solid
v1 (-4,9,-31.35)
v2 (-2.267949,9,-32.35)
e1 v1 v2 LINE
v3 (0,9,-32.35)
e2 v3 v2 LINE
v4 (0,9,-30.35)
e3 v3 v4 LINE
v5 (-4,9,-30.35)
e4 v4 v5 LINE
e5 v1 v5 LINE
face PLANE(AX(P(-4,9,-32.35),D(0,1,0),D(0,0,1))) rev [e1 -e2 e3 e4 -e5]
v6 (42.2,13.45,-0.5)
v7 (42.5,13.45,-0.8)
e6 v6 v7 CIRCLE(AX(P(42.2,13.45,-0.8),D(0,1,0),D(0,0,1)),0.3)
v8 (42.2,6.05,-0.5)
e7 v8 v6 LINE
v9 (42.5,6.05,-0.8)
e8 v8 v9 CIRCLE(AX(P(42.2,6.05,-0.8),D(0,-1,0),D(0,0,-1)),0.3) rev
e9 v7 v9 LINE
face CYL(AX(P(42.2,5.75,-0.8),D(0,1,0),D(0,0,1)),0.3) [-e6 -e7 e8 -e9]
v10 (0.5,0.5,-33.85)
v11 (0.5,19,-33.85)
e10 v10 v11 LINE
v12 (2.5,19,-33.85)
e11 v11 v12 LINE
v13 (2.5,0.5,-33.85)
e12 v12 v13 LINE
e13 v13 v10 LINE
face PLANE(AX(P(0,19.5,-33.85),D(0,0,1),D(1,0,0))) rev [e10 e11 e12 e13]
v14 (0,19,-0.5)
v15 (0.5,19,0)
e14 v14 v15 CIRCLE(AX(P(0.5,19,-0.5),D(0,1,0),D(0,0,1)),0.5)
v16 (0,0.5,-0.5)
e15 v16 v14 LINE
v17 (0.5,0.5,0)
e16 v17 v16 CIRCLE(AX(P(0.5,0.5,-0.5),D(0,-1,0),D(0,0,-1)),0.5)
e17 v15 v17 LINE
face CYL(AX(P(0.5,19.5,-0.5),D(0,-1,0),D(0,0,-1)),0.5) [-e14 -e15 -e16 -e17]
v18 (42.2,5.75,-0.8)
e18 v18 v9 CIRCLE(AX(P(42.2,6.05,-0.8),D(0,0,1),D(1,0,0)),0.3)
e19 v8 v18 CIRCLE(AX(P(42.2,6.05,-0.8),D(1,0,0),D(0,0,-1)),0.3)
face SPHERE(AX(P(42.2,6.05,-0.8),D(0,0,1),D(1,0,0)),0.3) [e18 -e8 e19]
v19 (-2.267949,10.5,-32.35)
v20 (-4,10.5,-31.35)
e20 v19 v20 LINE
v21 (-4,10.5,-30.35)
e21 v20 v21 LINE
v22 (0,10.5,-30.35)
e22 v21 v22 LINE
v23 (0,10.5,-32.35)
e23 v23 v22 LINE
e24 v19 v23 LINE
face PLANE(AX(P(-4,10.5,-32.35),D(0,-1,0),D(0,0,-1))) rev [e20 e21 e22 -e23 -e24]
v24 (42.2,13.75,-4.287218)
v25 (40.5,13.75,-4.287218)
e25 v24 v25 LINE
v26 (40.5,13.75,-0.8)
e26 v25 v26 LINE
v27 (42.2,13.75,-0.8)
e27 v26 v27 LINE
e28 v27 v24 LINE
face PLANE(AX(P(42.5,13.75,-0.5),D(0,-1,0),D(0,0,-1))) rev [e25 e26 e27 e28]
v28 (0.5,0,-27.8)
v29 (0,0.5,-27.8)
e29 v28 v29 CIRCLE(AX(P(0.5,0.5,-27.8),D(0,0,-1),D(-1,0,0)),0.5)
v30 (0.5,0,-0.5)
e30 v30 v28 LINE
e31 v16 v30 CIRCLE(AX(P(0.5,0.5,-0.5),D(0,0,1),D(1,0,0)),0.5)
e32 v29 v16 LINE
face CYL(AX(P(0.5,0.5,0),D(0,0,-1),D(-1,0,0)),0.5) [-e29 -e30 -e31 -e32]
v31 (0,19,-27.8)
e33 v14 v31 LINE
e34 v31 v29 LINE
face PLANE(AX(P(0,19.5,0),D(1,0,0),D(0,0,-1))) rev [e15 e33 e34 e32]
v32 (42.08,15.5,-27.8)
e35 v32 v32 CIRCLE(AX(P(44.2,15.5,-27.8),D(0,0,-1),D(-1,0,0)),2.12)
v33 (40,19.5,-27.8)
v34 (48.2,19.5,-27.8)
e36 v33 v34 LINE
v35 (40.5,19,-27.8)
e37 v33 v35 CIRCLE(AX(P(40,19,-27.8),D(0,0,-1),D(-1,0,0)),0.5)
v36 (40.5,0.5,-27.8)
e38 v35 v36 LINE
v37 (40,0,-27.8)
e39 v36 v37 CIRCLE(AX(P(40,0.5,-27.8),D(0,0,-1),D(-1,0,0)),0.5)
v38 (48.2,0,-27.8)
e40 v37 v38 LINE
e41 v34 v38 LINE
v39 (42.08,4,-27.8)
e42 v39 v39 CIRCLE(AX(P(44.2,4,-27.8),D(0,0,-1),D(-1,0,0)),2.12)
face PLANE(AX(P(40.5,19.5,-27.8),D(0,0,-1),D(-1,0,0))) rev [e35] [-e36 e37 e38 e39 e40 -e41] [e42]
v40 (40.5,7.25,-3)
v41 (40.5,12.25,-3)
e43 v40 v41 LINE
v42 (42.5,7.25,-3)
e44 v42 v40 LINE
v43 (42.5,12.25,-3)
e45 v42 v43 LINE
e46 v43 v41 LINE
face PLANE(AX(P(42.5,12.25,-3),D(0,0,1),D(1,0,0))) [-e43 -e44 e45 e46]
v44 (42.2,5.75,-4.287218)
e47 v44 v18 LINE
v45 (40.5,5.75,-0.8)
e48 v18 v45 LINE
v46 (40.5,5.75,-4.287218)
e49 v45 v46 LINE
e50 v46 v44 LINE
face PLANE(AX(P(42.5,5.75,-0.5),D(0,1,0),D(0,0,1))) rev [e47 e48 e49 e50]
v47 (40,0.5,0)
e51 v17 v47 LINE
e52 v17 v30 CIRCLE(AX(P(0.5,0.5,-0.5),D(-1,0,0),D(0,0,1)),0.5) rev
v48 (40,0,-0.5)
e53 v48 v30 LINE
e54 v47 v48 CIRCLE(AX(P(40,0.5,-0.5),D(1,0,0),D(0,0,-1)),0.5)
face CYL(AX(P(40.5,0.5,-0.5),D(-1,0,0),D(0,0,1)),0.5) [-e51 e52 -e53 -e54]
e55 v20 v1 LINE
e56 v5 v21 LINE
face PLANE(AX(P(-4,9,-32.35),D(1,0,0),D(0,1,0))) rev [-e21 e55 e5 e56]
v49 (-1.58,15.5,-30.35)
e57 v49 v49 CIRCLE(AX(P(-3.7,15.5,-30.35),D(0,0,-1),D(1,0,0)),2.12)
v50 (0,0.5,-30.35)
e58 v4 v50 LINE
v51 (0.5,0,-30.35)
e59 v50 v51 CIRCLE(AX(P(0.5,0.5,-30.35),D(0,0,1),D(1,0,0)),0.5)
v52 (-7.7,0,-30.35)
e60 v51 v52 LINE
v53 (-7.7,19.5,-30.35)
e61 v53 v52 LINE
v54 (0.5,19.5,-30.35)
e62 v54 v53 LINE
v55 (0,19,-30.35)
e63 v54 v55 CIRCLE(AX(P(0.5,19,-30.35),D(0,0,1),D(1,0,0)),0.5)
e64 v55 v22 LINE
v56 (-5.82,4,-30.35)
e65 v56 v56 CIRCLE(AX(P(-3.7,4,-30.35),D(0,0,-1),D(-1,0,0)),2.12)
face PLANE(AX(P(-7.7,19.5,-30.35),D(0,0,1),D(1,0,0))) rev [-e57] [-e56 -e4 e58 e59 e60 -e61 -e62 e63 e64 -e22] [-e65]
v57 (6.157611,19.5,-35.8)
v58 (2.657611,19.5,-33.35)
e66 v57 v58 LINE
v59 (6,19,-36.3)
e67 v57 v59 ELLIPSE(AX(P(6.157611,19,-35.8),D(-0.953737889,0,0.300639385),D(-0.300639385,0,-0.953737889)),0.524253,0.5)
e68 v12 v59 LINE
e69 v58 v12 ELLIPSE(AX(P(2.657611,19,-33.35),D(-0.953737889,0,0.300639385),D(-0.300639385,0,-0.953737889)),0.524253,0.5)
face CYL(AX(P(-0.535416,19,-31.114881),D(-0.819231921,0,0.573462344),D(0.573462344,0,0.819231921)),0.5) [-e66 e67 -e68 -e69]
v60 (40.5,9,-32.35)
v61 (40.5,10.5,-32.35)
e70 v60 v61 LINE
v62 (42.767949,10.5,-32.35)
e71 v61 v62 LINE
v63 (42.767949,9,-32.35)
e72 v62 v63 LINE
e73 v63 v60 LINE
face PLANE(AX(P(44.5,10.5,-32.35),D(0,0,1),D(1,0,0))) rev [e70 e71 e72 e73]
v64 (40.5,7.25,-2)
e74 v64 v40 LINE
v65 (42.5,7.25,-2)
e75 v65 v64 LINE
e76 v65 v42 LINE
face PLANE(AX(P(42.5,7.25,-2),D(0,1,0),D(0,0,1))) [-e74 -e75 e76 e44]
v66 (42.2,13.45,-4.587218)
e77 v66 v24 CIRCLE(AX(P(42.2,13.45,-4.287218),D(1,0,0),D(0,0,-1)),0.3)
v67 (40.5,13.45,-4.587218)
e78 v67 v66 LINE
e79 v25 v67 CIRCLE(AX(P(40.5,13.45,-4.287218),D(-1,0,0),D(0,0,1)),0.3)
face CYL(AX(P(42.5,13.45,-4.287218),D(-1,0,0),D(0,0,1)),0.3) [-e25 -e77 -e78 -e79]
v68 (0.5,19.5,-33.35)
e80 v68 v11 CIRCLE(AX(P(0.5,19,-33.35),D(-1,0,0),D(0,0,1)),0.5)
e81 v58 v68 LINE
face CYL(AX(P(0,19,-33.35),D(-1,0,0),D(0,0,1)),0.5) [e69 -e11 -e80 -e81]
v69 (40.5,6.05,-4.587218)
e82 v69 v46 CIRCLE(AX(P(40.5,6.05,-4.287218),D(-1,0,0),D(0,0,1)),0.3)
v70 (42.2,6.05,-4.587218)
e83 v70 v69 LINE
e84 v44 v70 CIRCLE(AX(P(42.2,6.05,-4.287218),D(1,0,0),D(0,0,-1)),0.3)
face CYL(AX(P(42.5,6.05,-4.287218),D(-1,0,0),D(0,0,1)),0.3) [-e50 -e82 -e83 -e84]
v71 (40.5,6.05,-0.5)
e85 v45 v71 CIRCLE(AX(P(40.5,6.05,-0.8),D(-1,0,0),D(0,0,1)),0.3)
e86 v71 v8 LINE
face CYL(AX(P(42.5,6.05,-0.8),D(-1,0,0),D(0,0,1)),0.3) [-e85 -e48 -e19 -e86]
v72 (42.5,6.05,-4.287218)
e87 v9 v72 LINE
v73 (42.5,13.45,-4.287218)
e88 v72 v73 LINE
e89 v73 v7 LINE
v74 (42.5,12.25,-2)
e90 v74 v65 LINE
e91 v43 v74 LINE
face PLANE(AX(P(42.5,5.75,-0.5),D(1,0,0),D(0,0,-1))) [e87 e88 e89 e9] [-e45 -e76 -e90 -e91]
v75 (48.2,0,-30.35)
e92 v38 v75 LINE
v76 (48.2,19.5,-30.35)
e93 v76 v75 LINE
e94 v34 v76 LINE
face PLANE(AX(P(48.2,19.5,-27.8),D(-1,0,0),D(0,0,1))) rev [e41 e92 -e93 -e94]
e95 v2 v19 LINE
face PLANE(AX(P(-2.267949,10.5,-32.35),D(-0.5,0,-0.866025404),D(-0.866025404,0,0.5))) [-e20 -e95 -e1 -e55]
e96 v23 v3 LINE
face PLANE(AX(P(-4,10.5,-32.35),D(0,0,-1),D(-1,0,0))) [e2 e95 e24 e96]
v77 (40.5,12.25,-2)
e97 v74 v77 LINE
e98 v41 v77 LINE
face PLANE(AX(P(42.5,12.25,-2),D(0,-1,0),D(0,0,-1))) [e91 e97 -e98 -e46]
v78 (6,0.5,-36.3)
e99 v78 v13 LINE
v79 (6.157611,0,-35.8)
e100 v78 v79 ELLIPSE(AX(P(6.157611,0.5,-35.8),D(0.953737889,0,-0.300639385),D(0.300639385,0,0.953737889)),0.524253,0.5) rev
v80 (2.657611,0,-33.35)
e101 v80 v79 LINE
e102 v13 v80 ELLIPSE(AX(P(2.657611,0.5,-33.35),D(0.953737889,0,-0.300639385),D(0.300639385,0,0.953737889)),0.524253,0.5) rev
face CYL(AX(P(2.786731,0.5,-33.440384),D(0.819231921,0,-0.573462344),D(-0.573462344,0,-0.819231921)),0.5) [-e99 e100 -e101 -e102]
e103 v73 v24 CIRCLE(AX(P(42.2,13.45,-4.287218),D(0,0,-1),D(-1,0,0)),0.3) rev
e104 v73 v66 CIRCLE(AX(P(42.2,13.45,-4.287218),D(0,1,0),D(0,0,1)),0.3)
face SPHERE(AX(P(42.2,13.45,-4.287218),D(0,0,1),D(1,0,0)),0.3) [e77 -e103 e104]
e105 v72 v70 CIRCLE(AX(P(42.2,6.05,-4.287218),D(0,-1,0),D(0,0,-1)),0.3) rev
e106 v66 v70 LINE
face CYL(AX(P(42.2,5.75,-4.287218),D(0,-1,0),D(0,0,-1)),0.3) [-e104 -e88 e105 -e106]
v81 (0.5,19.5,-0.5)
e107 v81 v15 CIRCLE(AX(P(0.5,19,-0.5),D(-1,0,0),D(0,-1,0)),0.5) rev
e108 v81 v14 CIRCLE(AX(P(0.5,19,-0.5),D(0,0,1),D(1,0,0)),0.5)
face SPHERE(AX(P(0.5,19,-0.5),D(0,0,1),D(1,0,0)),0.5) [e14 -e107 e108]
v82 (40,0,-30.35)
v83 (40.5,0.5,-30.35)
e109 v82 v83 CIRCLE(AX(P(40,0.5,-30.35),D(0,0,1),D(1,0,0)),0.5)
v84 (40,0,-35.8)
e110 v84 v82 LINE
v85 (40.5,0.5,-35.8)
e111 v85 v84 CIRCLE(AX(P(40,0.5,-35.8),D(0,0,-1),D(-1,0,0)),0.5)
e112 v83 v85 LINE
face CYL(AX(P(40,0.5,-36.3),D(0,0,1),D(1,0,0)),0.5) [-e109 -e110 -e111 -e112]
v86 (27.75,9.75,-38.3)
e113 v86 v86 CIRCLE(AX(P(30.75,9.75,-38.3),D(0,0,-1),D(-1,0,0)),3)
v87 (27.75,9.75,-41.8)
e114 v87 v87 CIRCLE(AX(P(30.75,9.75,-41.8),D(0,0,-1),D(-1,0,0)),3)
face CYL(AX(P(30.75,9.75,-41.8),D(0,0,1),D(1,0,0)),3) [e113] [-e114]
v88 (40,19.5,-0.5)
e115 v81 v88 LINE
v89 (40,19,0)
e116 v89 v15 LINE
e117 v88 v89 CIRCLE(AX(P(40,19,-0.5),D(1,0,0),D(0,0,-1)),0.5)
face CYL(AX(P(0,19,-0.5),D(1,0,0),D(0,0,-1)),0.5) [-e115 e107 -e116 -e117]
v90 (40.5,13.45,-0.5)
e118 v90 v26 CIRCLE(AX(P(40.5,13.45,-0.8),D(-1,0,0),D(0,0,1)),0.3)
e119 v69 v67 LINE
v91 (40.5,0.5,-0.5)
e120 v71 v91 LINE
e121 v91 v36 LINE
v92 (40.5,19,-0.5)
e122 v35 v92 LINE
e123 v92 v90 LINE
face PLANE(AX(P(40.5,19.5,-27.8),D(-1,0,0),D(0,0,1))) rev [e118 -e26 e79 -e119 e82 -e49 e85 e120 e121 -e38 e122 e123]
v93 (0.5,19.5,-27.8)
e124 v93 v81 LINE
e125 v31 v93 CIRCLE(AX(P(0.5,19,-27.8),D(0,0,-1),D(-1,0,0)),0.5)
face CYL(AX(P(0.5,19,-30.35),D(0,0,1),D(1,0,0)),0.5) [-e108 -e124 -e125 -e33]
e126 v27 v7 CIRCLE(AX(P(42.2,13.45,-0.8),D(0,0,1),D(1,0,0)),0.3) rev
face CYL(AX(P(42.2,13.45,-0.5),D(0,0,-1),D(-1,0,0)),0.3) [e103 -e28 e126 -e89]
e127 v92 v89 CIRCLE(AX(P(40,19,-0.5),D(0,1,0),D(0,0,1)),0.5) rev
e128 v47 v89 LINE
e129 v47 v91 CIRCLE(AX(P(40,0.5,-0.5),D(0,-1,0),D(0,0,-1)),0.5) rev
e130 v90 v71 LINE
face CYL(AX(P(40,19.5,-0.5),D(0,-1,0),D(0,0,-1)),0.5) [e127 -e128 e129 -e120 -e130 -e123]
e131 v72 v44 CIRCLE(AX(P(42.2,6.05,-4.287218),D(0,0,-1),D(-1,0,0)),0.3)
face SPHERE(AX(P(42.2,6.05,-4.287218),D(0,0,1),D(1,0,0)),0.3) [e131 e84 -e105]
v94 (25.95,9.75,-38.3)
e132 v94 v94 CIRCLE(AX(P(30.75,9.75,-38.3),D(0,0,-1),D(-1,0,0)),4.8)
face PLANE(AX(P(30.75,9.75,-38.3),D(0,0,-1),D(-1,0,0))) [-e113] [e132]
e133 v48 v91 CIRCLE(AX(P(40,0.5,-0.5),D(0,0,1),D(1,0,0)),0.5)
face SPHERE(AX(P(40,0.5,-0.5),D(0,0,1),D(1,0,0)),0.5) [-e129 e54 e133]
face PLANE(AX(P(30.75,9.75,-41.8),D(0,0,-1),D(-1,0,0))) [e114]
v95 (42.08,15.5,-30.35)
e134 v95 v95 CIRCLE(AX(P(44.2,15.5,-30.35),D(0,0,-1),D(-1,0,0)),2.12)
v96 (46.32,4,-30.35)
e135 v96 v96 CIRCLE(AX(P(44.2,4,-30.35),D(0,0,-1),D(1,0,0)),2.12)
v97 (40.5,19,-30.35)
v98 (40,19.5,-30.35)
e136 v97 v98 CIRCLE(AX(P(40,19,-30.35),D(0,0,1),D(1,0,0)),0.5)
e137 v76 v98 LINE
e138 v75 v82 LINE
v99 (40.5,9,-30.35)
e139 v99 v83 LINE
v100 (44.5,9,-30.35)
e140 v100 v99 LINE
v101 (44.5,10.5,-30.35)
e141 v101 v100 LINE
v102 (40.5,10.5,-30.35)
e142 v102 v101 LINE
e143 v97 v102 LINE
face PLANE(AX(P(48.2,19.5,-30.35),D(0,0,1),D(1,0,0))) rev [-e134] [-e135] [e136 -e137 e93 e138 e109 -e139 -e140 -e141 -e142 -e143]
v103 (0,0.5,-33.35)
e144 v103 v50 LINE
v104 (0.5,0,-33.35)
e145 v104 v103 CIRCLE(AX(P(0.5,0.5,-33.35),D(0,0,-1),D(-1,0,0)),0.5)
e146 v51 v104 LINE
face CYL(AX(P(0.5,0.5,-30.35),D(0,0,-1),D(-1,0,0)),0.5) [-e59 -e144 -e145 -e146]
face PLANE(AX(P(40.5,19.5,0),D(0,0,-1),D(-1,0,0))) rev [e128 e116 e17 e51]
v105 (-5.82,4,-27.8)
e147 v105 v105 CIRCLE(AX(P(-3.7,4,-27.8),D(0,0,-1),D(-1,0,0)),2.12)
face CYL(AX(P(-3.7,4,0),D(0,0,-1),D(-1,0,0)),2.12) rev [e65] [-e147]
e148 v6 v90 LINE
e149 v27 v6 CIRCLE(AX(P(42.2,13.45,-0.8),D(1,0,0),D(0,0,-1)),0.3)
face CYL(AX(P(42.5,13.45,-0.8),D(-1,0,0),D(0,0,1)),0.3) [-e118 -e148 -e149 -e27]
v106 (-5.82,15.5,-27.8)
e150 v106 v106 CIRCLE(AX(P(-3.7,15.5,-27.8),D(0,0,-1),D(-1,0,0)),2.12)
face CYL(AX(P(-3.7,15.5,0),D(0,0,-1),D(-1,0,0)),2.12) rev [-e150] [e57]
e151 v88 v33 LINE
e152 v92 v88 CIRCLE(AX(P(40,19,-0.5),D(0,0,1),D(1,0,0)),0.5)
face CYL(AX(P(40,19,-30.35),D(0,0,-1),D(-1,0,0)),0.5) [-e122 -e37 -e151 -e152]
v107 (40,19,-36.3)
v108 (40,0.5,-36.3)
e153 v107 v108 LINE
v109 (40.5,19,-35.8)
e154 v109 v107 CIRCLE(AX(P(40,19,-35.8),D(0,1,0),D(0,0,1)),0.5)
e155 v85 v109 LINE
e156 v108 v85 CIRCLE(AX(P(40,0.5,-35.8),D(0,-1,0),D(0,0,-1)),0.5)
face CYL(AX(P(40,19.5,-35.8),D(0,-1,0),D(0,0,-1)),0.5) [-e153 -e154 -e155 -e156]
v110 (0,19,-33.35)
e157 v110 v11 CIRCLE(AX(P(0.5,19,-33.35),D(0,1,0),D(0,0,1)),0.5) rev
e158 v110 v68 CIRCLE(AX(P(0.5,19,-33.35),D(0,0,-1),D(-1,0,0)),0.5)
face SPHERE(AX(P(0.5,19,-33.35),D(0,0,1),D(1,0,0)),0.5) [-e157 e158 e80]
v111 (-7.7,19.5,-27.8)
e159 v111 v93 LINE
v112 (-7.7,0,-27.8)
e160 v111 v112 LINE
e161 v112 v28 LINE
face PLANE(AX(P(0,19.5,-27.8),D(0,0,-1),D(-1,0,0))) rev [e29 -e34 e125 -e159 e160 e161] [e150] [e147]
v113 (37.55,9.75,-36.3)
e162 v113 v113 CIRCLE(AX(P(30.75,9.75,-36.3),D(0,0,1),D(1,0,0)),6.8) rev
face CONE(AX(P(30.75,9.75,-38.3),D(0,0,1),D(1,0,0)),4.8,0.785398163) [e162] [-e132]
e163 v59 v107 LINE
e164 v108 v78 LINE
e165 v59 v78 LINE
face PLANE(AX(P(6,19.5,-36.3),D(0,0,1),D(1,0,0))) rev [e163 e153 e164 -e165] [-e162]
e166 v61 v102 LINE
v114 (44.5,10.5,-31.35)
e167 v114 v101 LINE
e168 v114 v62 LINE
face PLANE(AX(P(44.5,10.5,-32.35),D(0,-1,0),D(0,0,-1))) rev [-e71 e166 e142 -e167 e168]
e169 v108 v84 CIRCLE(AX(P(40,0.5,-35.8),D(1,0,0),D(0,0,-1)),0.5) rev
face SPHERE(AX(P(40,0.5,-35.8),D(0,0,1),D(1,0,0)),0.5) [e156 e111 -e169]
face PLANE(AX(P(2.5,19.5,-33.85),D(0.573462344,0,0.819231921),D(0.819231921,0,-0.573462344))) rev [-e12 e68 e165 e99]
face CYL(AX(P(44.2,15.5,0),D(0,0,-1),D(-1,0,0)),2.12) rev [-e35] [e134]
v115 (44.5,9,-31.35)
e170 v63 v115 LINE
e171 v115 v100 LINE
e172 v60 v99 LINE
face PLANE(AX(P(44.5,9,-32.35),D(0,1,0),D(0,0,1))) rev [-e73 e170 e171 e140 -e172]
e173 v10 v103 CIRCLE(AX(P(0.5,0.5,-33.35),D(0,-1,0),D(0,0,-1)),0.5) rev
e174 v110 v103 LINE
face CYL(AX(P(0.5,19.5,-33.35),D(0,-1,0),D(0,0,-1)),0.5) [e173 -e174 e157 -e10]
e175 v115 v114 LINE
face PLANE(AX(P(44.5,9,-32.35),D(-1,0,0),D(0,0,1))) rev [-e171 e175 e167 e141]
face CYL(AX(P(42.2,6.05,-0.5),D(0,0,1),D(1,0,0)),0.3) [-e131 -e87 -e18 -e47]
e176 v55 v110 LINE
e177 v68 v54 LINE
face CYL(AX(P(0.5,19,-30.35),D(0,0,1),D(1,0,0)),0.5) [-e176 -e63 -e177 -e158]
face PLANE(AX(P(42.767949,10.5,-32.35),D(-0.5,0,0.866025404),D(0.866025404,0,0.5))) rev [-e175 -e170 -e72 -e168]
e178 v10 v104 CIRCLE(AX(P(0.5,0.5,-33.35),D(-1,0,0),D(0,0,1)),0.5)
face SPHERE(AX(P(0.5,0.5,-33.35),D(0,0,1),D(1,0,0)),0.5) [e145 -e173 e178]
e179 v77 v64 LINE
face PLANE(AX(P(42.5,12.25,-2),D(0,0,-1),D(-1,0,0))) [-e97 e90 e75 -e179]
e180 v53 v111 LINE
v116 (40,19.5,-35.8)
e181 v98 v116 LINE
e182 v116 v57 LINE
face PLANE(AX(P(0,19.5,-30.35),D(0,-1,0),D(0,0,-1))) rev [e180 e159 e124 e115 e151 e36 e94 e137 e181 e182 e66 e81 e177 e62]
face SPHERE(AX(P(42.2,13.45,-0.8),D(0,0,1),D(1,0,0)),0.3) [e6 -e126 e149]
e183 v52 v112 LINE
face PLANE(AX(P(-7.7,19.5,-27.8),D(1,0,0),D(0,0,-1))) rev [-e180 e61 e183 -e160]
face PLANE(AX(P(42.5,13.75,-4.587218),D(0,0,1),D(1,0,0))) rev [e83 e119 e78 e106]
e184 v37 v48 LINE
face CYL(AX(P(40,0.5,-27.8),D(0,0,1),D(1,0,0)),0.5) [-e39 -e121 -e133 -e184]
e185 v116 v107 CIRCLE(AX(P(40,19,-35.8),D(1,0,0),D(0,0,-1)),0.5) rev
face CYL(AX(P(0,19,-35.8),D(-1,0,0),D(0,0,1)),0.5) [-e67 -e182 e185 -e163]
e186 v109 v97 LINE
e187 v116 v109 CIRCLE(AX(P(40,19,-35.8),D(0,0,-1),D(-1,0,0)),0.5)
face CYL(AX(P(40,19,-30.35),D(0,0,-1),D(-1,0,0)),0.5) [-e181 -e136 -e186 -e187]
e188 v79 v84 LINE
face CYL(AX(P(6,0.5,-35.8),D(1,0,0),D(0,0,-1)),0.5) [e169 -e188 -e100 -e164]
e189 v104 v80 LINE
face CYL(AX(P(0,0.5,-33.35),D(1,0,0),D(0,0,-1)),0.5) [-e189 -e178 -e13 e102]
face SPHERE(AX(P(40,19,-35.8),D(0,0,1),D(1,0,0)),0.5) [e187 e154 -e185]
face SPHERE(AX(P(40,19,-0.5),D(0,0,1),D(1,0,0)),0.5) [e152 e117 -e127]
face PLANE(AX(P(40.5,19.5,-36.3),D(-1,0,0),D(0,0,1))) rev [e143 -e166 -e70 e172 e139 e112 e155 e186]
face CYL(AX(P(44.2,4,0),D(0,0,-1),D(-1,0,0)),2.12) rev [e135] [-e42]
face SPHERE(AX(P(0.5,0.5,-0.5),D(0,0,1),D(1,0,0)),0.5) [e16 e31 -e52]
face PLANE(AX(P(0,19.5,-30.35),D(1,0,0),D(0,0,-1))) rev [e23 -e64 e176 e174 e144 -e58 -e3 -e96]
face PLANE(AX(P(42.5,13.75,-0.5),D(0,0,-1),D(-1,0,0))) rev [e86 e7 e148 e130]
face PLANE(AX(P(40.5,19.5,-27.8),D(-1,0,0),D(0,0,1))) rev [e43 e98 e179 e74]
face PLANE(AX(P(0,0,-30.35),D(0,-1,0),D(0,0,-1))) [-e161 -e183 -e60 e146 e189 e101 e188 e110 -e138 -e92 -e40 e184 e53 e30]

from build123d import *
from OCP.BRepFilletAPI import BRepFilletAPI_MakeChamfer

# Parameters (mm, degrees)
EXTRUSION1_DEPTH        = 19.5
ESQUISSE3_R             = 2.12
ENL_V_MAT_EXTRU_1_DEPTH = 61.204754796
ESQUISSE4_R             = 6.8
EXTRUSION2_DEPTH        = 2
ESQUISSE5_R             = 3
EXTRUSION3_DEPTH        = 3.5
CHANFREIN1_SIZE         = 2
ESQUISSE6_W             = 4
ESQUISSE6_H             = 1.5
EXTRUSION4_DEPTH        = 2
CHANFREIN2_SIZE         = 1
CHANFREIN2_SIZE2        = 1.732050808
ESQUISSE8_W             = 4.087218226
ESQUISSE8_H             = 8
ESQUISSE8_W_2           = 1
ESQUISSE8_H_2           = 5
EXTRUSION5_DEPTH        = 2
CONG_2_R                = 0.5
CONG_3_R                = 0.3


with BuildPart() as part:
    # Esquisse1 → Extrusion1 (new body)
    with BuildSketch(Plane(origin=(0, 0, 0), x_dir=(1, 0, 0), z_dir=(0, 1, 0))):
        Polygon((0, 27.8), (-7.7, 27.8), (-7.7, 30.35), (0, 30.35), (0, 33.85), (2.5, 33.85), (6, 36.3), (40.5, 36.3), (40.5, 30.35), (48.2, 30.35), (48.2, 27.8), (40.5, 27.8), (40.5, 0), (0, 0), align=None)
    extrude(amount=EXTRUSION1_DEPTH)

    # Esquisse3 → Enlèv. mat.-Extru.1 (cut, through all)
    with BuildSketch(Plane(origin=(0, 0, -30.35), x_dir=(-1, 0, 0), z_dir=(0, 0, -1))):
        with Locations((3.7, 4)):
            Circle(ESQUISSE3_R)
        with Locations((3.7, 15.5)):
            Circle(ESQUISSE3_R)
        with Locations((-44.2, 15.5)):
            Circle(ESQUISSE3_R)
        with Locations((-44.2, 4)):
            Circle(ESQUISSE3_R)
    extrude(amount=-ENL_V_MAT_EXTRU_1_DEPTH, mode=Mode.SUBTRACT)

    # Esquisse4 → Extrusion2 (add)
    with BuildSketch(Plane(origin=(0, 0, -36.3), x_dir=(-1, 0, 0), z_dir=(0, 0, -1))):
        with Locations(Location((-30.75, 9.75, 0), (0, 0, 180))):
            Circle(ESQUISSE4_R)
    extrude(amount=EXTRUSION2_DEPTH)

    # Esquisse5 → Extrusion3 (add)
    with BuildSketch(Plane(origin=(0, 0, -38.3), x_dir=(-1, 0, 0), z_dir=(0, 0, -1))):
        with Locations((-30.75, 9.75)):
            Circle(ESQUISSE5_R)
    extrude(amount=EXTRUSION3_DEPTH)

    # Chanfrein1
    chanfrein1_edges = [part.edges().sort_by_distance(p)[0] for p in [
        (23.95, 9.75, -38.3),
    ]]
    chamfer(chanfrein1_edges, length=CHANFREIN1_SIZE - 0.0001)  # a hair under: the kernel refuses the full size

    # Esquisse6 → Extrusion4 (add)
    with BuildSketch(Plane(origin=(0, 0, -30.35), x_dir=(-1, 0, 0), z_dir=(0, 0, -1))):
        with Locations((-42.5, 9.75)):
            Rectangle(ESQUISSE6_W, ESQUISSE6_H)
        with Locations((2, 9.75)):
            Rectangle(ESQUISSE6_W, ESQUISSE6_H)
    extrude(amount=EXTRUSION4_DEPTH)

    # Chanfrein2: one chamfer whose edges measure the first distance from different faces: ONE call of the kernel's chamfer builder (chamfer() names one face for all edges)
    chanfrein2_edges_1 = [part.edges().sort_by_distance(p)[0] for p in [
        (-4, 9.75, -32.35),
    ]]
    chanfrein2_side_1 = [part.faces().sort_by_distance(p)[0] for p in [
        (-4, 9.75, -31.35),
    ]]
    chanfrein2_edges_2 = [part.edges().sort_by_distance(p)[0] for p in [
        (44.5, 9.75, -32.35),
    ]]
    chanfrein2_side_2 = [part.faces().sort_by_distance(p)[0] for p in [
        (44.5, 9.75, -31.35),
    ]]
    chanfrein2 = BRepFilletAPI_MakeChamfer(part.part.solid().wrapped)
    for e in chanfrein2_edges_1:
        chanfrein2.Add(CHANFREIN2_SIZE, CHANFREIN2_SIZE2, e.wrapped, chanfrein2_side_1[0].wrapped)  # the first distance lies on this face
    for e in chanfrein2_edges_2:
        chanfrein2.Add(CHANFREIN2_SIZE, CHANFREIN2_SIZE2, e.wrapped, chanfrein2_side_2[0].wrapped)  # the first distance lies on this face
    add(Compound.cast(chanfrein2.Shape()), mode=Mode.REPLACE)

    # Esquisse8 → Extrusion5 (add)
    with BuildSketch(Plane(origin=(40.5, 0, 0), x_dir=(0, 0, -1), z_dir=(1, 0, 0))):
        with Locations((2.543609113, 9.75)):
            Rectangle(ESQUISSE8_W, ESQUISSE8_H)
        with Locations((2.5, 9.75)):
            Rectangle(ESQUISSE8_W_2, ESQUISSE8_H_2, mode=Mode.SUBTRACT)
    extrude(amount=EXTRUSION5_DEPTH)

    # Congé2
    cong_2_edges = [part.edges().sort_by_distance(p)[0] for p in [
        (40.5, 19.5, -13.9),
        (0, 0, -32.1),
        (1.25, 0, -33.85),
        (4.25, 0, -35.075),
        (23.25, 0, -36.3),
        (40.5, 0, -33.325),
        (40.5, 0, -13.9),
        (20.25, 0, 0),
        (0, 0, -13.9),
        (0, 9.75, -33.85),
        (40.5, 9.75, -36.3),
        (40.5, 19.5, -33.325),
        (40.5, 9.75, 0),
        (0, 9.75, 0),
        (23.25, 19.5, -36.3),
        (4.25, 19.5, -35.075),
        (1.25, 19.5, -33.85),
        (0, 19.5, -32.1),
        (0, 19.5, -13.9),
        (20.25, 19.5, 0),
    ]]
    fillet(cong_2_edges, radius=CONG_2_R - 0.0001)  # a hair under: the kernel refuses the full size

    # Congé3
    cong_3_edges = [part.edges().sort_by_distance(p)[0] for p in [
        (42.5, 9.75, -0.5),
        (42.5, 5.75, -2.543609113),
        (42.5, 9.75, -4.587218226),
        (42.5, 13.75, -2.543609113),
        (41.5, 13.75, -0.5),
        (41.5, 5.75, -0.5),
        (41.5, 5.75, -4.587218226),
        (41.5, 13.75, -4.587218226),
    ]]
    fillet(cong_3_edges, radius=CONG_3_R)


solid = part.part
